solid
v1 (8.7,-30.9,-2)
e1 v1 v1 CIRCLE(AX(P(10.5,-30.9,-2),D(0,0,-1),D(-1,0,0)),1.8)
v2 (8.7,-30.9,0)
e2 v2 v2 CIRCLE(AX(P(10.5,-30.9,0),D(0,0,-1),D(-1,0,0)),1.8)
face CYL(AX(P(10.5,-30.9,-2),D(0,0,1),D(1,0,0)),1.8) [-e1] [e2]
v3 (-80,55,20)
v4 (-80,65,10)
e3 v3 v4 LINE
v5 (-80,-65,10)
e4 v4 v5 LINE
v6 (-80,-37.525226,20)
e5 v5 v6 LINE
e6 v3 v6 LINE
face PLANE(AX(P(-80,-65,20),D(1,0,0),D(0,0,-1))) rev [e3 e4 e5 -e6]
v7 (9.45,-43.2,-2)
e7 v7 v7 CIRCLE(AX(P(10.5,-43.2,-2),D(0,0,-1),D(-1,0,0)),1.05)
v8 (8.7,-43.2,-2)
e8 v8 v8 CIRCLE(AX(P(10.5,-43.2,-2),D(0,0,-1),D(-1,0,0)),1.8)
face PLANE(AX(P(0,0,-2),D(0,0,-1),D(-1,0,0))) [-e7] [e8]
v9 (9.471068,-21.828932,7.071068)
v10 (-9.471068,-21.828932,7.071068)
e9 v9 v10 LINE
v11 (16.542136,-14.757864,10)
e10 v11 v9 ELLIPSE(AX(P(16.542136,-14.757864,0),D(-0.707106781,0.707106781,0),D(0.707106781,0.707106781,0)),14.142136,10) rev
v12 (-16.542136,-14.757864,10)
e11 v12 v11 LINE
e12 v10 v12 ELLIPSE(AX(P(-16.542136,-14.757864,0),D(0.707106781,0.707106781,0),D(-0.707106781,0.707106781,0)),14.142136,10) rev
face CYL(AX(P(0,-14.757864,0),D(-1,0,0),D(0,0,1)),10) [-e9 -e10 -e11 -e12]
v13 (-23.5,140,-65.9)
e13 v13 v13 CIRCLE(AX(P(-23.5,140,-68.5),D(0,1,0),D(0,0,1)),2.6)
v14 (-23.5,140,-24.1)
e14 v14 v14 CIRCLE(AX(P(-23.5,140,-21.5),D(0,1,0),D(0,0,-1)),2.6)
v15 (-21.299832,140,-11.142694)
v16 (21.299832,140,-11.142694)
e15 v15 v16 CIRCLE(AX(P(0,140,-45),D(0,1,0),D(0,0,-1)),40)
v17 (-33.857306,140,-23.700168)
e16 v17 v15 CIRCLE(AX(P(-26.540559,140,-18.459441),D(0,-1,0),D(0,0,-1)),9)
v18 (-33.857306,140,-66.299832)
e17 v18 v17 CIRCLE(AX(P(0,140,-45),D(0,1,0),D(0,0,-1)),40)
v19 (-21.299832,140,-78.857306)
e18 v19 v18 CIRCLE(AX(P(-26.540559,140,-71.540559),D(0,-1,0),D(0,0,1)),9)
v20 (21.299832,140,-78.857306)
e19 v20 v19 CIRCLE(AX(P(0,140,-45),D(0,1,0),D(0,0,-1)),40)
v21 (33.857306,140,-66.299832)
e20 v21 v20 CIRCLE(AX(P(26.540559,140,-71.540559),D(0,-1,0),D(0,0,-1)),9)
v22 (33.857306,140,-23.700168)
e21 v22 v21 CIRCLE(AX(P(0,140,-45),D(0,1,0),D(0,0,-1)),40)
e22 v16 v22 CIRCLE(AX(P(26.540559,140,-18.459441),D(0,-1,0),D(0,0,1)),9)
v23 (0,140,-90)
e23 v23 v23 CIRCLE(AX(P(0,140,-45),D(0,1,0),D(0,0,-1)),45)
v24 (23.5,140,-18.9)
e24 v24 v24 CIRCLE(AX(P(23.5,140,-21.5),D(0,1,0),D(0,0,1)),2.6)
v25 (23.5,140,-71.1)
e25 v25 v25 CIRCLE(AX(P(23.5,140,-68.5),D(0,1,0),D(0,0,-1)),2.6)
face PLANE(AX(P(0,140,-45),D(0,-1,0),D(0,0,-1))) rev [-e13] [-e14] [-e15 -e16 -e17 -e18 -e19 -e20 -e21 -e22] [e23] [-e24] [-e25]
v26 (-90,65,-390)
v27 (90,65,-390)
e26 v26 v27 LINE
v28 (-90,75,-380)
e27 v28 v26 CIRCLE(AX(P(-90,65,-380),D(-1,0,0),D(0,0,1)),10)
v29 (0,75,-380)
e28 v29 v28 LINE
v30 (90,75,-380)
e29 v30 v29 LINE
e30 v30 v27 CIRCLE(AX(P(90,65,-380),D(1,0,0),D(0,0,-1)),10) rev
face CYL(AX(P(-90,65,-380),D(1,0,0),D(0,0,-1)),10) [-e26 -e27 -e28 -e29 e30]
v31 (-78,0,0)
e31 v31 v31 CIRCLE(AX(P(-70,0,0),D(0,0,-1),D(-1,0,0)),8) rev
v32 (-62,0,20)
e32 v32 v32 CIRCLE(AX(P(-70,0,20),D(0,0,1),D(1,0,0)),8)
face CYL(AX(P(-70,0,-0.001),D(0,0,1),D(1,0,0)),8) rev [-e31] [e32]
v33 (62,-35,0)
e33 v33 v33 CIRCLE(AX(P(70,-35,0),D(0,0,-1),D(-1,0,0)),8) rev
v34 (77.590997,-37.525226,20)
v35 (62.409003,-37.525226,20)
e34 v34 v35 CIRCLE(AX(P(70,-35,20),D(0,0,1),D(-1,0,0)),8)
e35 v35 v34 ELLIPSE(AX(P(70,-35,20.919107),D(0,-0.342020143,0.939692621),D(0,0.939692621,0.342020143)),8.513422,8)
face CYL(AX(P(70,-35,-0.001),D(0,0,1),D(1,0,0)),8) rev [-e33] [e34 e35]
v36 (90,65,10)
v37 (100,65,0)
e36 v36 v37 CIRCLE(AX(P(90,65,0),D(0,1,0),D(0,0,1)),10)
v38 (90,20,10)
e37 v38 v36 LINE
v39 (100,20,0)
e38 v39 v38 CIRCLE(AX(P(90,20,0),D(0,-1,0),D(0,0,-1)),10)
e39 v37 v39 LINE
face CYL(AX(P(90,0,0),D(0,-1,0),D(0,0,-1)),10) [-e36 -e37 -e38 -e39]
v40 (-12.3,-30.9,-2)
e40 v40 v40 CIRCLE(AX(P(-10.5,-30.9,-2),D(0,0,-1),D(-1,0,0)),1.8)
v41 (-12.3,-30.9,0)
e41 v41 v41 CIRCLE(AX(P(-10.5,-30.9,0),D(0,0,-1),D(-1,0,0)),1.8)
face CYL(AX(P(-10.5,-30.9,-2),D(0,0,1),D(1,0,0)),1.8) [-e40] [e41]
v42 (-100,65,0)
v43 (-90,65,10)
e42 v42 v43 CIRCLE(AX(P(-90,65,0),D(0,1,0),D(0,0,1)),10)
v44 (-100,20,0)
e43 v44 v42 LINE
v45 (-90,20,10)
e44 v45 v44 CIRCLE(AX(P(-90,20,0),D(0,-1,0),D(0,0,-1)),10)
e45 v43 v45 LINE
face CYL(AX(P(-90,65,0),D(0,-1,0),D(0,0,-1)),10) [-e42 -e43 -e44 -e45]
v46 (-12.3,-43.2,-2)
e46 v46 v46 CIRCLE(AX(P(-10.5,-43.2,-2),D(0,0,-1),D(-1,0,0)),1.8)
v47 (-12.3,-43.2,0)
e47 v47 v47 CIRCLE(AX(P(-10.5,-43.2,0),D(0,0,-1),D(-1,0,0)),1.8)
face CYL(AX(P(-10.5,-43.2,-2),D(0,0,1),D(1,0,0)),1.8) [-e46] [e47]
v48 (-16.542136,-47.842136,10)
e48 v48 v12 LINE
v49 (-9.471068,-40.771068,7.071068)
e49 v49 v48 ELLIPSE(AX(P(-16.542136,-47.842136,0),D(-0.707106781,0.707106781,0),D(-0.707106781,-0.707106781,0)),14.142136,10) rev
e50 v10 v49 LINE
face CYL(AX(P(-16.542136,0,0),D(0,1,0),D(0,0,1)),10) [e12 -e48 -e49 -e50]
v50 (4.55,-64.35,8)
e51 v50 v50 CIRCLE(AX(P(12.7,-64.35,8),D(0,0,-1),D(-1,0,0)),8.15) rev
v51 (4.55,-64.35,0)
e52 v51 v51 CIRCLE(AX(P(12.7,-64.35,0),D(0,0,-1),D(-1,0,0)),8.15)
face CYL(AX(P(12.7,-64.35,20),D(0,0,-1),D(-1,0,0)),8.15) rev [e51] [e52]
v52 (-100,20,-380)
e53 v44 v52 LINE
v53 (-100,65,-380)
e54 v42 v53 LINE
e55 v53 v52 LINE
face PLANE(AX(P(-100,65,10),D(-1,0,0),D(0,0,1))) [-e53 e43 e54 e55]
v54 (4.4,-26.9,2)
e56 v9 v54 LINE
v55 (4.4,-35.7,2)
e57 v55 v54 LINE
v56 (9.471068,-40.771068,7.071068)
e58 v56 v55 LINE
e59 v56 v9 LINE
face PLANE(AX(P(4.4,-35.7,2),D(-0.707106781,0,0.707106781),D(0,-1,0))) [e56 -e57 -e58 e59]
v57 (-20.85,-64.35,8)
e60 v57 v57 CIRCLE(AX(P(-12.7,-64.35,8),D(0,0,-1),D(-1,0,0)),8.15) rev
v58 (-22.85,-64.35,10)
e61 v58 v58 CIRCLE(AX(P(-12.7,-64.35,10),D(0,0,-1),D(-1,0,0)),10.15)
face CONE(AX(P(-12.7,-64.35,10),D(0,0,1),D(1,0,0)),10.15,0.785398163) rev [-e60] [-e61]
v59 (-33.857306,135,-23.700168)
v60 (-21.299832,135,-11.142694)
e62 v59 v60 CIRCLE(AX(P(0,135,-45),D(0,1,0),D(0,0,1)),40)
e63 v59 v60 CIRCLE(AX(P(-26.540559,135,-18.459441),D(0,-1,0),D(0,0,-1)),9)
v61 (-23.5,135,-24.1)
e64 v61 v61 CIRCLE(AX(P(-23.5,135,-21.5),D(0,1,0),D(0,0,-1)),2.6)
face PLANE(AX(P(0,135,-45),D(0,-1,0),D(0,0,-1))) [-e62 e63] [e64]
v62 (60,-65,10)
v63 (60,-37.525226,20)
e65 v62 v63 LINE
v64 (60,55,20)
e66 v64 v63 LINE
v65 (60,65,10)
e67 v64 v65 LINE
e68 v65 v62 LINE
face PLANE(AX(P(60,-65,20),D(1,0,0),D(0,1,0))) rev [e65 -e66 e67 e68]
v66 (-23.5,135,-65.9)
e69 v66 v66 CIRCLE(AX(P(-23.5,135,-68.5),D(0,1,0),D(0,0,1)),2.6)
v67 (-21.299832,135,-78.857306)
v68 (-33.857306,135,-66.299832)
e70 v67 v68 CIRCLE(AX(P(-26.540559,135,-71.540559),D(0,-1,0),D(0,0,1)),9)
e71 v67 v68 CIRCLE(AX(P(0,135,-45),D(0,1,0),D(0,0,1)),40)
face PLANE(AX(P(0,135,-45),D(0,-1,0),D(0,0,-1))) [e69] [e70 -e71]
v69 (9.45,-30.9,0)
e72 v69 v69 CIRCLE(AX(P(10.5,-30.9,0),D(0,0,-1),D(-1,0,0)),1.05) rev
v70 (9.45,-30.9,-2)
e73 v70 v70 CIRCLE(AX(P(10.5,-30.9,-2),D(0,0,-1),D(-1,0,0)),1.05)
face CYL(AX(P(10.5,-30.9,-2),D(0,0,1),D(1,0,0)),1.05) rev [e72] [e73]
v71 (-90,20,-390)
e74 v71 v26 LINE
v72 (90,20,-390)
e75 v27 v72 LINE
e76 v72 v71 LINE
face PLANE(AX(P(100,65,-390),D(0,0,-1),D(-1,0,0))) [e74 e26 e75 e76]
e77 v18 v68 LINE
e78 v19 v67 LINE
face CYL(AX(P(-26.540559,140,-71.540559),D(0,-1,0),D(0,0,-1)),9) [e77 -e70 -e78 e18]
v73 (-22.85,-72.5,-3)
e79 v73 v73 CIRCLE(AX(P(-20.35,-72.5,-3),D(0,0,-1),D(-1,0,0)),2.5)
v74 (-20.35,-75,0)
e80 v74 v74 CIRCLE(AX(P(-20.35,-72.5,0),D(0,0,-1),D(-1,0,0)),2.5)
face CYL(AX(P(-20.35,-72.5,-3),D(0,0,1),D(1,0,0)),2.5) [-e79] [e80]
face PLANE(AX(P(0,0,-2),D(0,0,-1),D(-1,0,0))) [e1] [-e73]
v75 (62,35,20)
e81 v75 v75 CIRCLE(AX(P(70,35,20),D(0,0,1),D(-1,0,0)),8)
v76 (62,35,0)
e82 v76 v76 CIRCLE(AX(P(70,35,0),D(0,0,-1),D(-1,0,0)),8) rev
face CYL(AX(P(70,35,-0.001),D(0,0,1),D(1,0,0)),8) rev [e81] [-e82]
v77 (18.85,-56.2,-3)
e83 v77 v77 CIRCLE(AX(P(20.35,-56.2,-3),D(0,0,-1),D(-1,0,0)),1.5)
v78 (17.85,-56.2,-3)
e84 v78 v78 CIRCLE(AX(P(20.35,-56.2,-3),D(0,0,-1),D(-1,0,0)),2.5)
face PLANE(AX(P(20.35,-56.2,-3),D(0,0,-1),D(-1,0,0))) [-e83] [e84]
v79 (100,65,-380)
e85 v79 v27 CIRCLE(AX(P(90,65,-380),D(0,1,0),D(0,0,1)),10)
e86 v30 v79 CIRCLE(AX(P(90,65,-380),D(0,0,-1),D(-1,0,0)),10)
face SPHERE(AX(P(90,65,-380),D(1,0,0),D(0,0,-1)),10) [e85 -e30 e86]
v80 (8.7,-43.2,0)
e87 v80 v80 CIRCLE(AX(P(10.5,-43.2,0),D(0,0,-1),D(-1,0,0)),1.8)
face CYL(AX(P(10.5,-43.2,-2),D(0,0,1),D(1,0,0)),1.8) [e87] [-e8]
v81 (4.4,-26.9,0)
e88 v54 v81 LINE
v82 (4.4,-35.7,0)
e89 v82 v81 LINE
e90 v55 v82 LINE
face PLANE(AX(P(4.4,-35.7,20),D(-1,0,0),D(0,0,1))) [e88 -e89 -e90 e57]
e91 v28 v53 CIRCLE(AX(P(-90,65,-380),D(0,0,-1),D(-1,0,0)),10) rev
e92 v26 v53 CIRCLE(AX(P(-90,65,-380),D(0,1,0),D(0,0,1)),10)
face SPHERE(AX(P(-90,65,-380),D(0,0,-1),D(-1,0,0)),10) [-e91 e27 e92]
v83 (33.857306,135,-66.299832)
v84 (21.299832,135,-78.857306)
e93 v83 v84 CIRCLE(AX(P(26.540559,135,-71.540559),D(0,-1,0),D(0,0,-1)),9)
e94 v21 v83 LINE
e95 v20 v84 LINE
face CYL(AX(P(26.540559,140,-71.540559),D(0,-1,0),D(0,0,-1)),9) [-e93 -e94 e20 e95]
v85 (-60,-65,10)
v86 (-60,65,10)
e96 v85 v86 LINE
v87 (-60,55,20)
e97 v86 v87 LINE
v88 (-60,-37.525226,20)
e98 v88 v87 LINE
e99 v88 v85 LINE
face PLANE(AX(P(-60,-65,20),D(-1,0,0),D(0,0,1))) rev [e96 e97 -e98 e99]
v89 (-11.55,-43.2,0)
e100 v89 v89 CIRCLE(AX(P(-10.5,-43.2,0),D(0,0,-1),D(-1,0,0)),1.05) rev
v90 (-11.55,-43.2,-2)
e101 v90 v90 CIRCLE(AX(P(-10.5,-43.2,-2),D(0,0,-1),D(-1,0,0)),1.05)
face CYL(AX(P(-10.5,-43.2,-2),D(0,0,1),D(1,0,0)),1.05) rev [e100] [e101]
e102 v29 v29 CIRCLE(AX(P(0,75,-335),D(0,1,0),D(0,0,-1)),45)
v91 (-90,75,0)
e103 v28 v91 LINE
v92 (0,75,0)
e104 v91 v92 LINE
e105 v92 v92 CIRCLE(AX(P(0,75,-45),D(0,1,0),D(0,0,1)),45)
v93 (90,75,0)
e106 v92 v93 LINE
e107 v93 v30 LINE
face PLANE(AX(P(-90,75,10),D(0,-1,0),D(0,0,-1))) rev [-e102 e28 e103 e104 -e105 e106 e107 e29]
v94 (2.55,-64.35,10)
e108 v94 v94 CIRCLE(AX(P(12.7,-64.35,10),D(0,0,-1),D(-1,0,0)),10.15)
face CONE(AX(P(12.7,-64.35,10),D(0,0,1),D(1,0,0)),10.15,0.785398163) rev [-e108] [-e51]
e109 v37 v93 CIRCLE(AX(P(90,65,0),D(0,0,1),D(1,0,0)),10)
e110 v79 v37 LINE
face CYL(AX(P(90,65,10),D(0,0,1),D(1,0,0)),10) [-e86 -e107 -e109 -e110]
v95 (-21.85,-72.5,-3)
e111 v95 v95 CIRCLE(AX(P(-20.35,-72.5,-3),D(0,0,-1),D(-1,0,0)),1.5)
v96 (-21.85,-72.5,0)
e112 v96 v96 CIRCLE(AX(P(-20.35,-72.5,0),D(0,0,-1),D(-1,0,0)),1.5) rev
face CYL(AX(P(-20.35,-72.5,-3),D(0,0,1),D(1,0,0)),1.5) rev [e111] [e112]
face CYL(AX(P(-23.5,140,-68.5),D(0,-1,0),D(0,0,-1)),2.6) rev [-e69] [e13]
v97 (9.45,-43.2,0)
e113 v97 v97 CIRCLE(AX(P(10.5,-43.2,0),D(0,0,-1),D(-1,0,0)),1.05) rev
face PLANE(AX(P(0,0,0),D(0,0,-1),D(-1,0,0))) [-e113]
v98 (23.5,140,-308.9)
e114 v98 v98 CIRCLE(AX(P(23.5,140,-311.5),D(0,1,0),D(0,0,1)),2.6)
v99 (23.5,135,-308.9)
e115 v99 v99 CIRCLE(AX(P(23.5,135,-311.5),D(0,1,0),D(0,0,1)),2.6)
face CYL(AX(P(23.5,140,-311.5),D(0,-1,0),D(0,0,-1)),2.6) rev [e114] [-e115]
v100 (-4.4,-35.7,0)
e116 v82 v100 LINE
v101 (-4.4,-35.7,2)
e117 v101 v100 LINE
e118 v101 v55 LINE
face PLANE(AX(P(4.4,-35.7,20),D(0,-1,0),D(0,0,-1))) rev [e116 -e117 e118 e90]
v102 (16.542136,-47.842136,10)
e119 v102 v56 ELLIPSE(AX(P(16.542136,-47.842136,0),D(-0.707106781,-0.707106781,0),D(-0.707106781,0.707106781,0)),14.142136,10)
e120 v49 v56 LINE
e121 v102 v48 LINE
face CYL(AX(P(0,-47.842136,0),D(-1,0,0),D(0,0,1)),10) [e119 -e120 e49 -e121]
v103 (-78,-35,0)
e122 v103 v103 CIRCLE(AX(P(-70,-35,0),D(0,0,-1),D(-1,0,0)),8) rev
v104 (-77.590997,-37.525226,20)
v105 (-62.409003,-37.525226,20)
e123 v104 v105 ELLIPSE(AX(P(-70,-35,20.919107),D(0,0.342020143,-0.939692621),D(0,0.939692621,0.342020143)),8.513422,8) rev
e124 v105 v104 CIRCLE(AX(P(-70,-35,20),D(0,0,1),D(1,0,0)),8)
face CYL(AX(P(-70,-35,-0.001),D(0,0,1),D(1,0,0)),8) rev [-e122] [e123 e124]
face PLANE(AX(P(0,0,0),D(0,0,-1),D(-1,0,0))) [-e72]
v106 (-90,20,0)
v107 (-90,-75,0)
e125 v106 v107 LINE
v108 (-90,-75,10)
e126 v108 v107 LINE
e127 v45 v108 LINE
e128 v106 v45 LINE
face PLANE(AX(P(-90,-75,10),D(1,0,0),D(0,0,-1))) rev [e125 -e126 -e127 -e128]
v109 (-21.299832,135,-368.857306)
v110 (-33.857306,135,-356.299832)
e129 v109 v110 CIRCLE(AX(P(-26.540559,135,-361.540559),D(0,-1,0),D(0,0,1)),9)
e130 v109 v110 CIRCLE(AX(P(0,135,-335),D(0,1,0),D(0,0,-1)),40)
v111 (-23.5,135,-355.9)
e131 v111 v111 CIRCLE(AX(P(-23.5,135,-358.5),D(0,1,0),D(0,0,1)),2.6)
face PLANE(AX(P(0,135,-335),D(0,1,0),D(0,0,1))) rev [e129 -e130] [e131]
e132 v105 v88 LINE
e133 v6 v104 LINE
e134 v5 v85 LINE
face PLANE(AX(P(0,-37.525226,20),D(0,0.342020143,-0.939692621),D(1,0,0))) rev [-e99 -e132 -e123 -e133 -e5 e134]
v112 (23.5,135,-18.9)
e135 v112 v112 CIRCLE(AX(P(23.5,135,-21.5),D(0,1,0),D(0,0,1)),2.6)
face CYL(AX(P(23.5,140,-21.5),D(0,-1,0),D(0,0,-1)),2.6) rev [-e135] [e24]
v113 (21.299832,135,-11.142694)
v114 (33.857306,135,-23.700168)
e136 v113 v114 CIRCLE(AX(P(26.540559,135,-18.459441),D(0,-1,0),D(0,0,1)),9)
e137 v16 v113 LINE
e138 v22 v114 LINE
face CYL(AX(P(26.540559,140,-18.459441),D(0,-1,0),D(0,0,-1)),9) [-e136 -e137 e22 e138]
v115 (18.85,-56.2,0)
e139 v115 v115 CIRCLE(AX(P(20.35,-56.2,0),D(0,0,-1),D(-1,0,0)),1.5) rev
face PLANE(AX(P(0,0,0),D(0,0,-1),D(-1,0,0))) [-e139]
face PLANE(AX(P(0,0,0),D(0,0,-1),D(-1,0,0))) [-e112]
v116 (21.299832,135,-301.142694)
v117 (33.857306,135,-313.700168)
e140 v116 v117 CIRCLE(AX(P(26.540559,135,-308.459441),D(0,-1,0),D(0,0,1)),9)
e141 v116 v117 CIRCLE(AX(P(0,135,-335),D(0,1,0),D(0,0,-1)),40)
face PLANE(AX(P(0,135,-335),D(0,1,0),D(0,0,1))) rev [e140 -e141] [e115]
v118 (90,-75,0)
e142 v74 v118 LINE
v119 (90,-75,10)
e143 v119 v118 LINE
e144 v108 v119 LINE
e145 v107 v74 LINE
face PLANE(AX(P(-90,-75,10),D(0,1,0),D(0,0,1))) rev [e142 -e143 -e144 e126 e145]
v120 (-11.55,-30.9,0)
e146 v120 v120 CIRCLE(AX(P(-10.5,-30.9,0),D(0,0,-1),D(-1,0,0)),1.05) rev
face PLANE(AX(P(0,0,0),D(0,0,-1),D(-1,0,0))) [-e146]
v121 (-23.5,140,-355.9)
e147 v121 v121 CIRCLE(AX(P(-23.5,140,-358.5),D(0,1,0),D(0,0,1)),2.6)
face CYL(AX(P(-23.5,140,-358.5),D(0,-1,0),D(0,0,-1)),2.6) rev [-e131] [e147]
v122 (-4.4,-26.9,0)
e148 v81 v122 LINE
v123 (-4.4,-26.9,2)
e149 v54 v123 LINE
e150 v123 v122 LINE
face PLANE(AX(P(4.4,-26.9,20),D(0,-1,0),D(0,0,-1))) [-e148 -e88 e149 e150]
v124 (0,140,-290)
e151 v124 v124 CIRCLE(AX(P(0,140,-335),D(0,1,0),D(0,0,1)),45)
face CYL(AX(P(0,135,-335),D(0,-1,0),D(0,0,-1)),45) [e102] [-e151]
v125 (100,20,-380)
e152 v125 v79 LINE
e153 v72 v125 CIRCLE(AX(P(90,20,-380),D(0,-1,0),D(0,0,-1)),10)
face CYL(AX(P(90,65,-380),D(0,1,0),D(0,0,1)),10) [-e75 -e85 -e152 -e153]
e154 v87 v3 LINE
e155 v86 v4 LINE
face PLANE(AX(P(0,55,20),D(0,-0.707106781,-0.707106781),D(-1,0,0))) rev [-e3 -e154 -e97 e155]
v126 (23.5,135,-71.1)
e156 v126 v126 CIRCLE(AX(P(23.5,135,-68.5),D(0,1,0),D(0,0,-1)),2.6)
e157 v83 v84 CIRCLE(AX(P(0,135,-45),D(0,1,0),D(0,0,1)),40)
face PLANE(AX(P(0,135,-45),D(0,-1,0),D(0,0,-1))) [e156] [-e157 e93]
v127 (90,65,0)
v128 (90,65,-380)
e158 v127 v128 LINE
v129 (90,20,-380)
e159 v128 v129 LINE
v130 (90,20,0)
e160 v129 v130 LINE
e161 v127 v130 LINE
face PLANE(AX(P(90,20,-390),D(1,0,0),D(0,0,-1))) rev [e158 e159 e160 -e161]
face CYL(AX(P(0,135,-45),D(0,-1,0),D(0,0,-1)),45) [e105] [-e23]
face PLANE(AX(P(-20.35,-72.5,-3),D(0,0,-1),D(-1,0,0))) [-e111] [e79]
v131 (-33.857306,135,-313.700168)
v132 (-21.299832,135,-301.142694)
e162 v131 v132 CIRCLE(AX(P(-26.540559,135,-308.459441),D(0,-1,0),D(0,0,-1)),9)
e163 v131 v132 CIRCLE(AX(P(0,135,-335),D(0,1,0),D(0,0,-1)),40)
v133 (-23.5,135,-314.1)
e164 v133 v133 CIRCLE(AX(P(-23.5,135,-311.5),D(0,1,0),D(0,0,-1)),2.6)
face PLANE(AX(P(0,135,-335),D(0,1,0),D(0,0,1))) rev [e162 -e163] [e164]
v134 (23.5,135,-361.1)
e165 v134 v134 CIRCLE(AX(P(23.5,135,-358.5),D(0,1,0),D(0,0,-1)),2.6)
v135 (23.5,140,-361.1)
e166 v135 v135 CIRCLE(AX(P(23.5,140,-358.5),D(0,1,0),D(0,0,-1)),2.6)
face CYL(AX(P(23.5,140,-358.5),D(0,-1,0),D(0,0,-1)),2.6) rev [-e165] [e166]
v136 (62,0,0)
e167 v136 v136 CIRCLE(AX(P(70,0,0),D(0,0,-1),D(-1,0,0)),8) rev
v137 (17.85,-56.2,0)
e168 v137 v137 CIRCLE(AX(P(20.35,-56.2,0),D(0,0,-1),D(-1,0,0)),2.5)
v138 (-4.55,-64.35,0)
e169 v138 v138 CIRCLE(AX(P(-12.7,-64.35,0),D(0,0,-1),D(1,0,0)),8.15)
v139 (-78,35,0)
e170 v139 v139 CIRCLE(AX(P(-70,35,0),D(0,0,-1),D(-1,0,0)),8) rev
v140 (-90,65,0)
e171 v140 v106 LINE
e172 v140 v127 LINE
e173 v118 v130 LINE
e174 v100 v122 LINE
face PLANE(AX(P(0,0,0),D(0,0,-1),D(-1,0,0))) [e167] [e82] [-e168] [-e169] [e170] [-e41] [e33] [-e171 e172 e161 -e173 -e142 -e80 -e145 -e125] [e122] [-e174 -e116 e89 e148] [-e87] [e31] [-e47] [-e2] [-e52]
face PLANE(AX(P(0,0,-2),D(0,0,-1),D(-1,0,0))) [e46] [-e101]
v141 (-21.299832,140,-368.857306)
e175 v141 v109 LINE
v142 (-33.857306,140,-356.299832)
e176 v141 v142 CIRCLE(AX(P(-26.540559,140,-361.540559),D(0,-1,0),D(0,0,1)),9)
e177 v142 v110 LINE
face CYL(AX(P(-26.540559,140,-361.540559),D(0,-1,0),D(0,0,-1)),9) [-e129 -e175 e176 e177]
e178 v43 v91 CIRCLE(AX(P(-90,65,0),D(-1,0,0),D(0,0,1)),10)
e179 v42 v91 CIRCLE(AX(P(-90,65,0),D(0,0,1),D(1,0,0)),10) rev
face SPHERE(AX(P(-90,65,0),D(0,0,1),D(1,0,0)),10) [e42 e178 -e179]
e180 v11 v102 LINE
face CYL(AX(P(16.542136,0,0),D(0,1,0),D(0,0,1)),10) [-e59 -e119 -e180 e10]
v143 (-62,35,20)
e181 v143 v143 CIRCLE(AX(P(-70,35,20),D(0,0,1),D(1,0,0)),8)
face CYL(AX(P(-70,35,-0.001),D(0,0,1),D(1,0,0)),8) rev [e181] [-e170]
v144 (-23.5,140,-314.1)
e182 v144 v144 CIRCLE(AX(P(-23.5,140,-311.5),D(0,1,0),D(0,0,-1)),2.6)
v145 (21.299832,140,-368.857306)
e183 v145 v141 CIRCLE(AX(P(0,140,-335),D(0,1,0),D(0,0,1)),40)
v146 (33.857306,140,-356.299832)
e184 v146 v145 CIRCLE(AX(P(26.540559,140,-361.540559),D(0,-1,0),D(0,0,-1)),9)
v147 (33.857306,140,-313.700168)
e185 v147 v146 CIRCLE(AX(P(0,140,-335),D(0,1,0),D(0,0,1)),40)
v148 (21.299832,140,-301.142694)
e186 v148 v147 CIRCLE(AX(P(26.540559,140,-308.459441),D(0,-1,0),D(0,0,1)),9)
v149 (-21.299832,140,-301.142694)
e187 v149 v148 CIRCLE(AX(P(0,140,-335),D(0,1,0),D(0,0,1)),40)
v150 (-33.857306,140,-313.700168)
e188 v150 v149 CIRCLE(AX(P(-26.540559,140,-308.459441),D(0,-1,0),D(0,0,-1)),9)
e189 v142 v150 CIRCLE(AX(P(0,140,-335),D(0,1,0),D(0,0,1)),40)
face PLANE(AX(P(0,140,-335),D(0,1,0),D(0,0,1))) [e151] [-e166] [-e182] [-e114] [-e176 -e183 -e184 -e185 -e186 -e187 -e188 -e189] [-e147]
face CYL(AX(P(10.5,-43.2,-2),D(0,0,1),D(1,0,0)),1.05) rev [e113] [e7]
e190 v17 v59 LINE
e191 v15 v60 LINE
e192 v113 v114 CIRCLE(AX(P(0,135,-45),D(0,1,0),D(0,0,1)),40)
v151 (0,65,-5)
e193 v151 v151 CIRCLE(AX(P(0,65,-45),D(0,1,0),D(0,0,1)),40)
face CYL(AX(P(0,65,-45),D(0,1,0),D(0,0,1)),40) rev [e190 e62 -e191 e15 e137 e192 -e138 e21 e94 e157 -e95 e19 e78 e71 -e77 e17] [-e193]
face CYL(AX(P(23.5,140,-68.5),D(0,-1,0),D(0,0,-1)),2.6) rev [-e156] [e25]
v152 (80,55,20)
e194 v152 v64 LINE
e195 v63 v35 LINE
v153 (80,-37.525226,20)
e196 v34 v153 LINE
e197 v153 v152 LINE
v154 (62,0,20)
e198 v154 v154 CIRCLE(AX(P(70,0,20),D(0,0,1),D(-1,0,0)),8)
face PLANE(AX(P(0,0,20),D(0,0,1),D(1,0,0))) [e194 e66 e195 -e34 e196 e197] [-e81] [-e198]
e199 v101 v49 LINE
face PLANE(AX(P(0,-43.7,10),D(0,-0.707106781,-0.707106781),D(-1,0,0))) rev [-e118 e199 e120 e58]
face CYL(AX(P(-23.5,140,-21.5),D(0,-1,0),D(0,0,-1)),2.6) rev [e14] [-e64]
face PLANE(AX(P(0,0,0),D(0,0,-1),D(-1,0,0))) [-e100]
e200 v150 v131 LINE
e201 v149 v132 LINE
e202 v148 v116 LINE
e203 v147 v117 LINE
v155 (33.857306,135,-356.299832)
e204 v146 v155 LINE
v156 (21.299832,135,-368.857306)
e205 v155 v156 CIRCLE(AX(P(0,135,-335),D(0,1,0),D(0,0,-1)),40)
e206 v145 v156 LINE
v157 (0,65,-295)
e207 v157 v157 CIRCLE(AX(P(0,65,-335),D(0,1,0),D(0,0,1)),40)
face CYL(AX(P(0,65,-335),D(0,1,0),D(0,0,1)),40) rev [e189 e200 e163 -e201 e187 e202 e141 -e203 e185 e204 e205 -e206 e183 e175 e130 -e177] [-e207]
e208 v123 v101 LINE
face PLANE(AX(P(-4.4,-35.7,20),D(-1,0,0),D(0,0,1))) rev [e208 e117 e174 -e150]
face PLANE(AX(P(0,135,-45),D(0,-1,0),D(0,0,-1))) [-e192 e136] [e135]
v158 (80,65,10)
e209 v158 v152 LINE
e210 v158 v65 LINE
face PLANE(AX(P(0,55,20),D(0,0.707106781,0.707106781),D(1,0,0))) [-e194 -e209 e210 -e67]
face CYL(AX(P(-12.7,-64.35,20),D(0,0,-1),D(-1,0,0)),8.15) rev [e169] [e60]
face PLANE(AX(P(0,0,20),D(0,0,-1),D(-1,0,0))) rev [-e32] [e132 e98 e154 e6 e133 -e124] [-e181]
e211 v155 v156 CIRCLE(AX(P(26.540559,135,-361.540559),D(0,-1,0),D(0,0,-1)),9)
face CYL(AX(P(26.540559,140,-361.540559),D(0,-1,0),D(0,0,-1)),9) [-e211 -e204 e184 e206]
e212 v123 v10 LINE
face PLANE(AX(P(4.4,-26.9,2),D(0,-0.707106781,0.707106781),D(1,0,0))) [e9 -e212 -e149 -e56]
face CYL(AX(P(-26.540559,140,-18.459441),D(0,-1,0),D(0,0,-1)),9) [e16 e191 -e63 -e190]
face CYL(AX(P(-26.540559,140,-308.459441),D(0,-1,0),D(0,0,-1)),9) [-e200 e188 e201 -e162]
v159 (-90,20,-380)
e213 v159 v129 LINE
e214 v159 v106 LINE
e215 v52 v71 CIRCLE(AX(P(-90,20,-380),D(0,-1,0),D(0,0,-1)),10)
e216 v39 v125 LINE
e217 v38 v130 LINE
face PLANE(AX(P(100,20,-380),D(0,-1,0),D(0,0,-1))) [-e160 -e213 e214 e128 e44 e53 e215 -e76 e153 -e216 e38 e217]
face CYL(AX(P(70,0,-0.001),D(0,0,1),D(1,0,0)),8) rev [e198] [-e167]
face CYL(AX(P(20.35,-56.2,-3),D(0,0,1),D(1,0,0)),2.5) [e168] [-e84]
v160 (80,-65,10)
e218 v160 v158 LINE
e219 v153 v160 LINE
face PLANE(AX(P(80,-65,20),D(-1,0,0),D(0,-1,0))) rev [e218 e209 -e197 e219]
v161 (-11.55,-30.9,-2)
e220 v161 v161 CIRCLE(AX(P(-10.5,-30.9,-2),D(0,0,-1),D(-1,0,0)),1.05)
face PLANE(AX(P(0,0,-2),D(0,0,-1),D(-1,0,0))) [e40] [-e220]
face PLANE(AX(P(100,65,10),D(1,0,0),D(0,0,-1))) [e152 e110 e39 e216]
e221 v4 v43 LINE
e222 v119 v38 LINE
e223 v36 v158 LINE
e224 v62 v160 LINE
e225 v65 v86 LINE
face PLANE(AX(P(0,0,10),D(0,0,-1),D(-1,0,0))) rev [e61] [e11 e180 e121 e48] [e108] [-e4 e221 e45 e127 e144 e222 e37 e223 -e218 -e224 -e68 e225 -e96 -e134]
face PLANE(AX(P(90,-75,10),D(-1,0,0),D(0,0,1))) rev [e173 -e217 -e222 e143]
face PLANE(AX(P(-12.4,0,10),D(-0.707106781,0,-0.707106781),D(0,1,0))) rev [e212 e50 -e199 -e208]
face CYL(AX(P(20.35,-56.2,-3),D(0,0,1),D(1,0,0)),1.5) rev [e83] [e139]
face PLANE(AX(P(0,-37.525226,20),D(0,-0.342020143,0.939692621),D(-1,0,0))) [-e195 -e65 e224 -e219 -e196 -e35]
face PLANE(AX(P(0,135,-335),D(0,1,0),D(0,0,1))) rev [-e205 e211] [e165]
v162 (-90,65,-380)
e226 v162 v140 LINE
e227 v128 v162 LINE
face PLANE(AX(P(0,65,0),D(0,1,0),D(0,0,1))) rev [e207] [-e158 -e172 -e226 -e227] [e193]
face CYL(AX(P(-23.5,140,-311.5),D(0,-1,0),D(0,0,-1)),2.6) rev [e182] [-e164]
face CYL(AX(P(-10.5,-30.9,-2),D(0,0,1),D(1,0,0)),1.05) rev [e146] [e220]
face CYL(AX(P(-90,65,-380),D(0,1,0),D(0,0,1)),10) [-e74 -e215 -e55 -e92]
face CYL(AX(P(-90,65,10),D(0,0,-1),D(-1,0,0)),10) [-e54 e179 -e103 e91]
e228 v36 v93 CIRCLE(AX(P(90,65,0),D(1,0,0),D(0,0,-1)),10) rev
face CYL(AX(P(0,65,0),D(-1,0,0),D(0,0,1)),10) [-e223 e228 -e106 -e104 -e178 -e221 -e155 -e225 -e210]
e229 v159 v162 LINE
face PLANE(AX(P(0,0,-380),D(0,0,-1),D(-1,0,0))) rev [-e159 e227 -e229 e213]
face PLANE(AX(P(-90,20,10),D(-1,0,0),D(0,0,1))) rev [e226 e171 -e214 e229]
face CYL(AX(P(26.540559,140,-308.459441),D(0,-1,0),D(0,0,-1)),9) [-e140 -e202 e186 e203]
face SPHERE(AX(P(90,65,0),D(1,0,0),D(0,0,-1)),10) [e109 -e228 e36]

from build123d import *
from build123d.topology import SkipClean

# Parameters (mm, degrees)
SKETCH1_W            = 180
SKETCH1_H            = 150
BOSS_EXTRUDE1_DEPTH  = 10
SKETCH2_W            = 20
SKETCH2_H            = 130
BOSS_EXTRUDE2_DEPTH  = 10
CUT_EXTRUDE1_REACH   = 120.849
SKETCH3_R            = 8
CHAMFER1_SIZE        = 10
CHAMFER2_SIZE        = 27.474774195
CHAMFER2_SIZE_2      = 10
SKETCH5_W            = 200
SKETCH5_H            = 400
BOSS_EXTRUDE4_DEPTH  = 10
SKETCH6_W            = 200
SKETCH6_H            = 55
BOSS_EXTRUDE5_DEPTH  = 10
SKETCH7_W            = 10
SKETCH7_H            = 400
BOSS_EXTRUDE6_DEPTH  = 45
FILLET1_R            = 10
SKETCH9_R            = 40
CUT_EXTRUDE2_DEPTH   = 10
SKETCH10_W           = 380
SKETCH10_H           = 10
BOSS_EXTRUDE7_DEPTH  = 180
SKETCH11_W           = 180
SKETCH11_H           = 200
SKETCH11_W_2         = 30
SKETCH11_H_2         = 20
CUT_EXTRUDE5_DEPTH   = 10
BOSS_EXTRUDE8_START  = 60
SKETCH13_R           = 45
SKETCH13_R_2         = 40
BOSS_EXTRUDE8_DEPTH  = 60
BOSS_EXTRUDE9_START  = 5
SKETCH14_R           = 45
SKETCH14_R_2         = 2.6
BOSS_EXTRUDE9_DEPTH  = 5
SKETCH17_R           = 2.5
SKETCH17_R_2         = 1.5
BOSS_EXTRUDE10_DEPTH = 3
SKETCH18_R           = 8.15
CUT_EXTRUDE6_DEPTH   = 427.262829719
CHAMFER3_SIZE        = 2
SKETCH20_R           = 1.8
SKETCH20_R_2         = 1.05
BOSS_EXTRUDE11_DEPTH = 2
SKETCH21_W           = 8.8
SKETCH21_H           = 8.8
CUT_EXTRUDE7_DEPTH   = 427.262829719
CHAMFER4_SIZE        = 8
FILLET2_R            = 10
SKETCH22_W           = 180
SKETCH22_H           = 380
CUT_EXTRUDE8_DEPTH   = 10


# Some blends are built 0.0001 mm under size
with BuildPart() as part:
    # Sketch1 → Boss-Extrude1 (new body)
    with BuildSketch(Plane.XY):
        Rectangle(SKETCH1_W, SKETCH1_H)
    extrude(amount=BOSS_EXTRUDE1_DEPTH)

    # Sketch2 → Boss-Extrude2 (add)
    with BuildSketch(Plane.XY.offset(10)):
        with Locations((70, 0)):
            Rectangle(SKETCH2_W, SKETCH2_H)
        with Locations((-70, 0)):
            Rectangle(SKETCH2_W, SKETCH2_H)
    extrude(amount=BOSS_EXTRUDE2_DEPTH)

    # Sketch3 → Cut-Extrude1 (cut, up to next)
    with BuildSketch(Plane.XY.offset(20), mode=Mode.PRIVATE) as cut_extrude1_sk1:
        with Locations((-70, 0)):
            Circle(SKETCH3_R)
    cut_extrude1_tool1 = extrude(cut_extrude1_sk1.sketch, amount=-CUT_EXTRUDE1_REACH, mode=Mode.PRIVATE) & part.part
    # Sketch3 → Cut-Extrude1 (cut, up to next)
    with BuildSketch(Plane.XY.offset(20), mode=Mode.PRIVATE) as cut_extrude1_sk2:
        with Locations((-70, -35)):
            Circle(SKETCH3_R)
    cut_extrude1_tool2 = extrude(cut_extrude1_sk2.sketch, amount=-CUT_EXTRUDE1_REACH, mode=Mode.PRIVATE) & part.part
    # Sketch3 → Cut-Extrude1 (cut, up to next)
    with BuildSketch(Plane.XY.offset(20), mode=Mode.PRIVATE) as cut_extrude1_sk3:
        with Locations((-70, 35)):
            Circle(SKETCH3_R)
    cut_extrude1_tool3 = extrude(cut_extrude1_sk3.sketch, amount=-CUT_EXTRUDE1_REACH, mode=Mode.PRIVATE) & part.part
    # Sketch3 → Cut-Extrude1 (cut, up to next)
    with BuildSketch(Plane.XY.offset(20), mode=Mode.PRIVATE) as cut_extrude1_sk4:
        with Locations(Location((70, -35, 0), (0, 0, 180))):
            Circle(SKETCH3_R)
    cut_extrude1_tool4 = extrude(cut_extrude1_sk4.sketch, amount=-CUT_EXTRUDE1_REACH, mode=Mode.PRIVATE) & part.part
    # Sketch3 → Cut-Extrude1 (cut, up to next)
    with BuildSketch(Plane.XY.offset(20), mode=Mode.PRIVATE) as cut_extrude1_sk5:
        with Locations(Location((70, 0, 0), (0, 0, 180))):
            Circle(SKETCH3_R)
    cut_extrude1_tool5 = extrude(cut_extrude1_sk5.sketch, amount=-CUT_EXTRUDE1_REACH, mode=Mode.PRIVATE) & part.part
    # Sketch3 → Cut-Extrude1 (cut, up to next)
    with BuildSketch(Plane.XY.offset(20), mode=Mode.PRIVATE) as cut_extrude1_sk6:
        with Locations(Location((70, 35, 0), (0, 0, 180))):
            Circle(SKETCH3_R)
    cut_extrude1_tool6 = extrude(cut_extrude1_sk6.sketch, amount=-CUT_EXTRUDE1_REACH, mode=Mode.PRIVATE) & part.part
    add(cut_extrude1_tool1.solids().sort_by_distance((-70, 0, 20))[0], mode=Mode.SUBTRACT)
    add(cut_extrude1_tool2.solids().sort_by_distance((-70, -35, 20))[0], mode=Mode.SUBTRACT)
    add(cut_extrude1_tool3.solids().sort_by_distance((-70, 35, 20))[0], mode=Mode.SUBTRACT)
    add(cut_extrude1_tool4.solids().sort_by_distance((70, -35, 20))[0], mode=Mode.SUBTRACT)
    add(cut_extrude1_tool5.solids().sort_by_distance((70, 0, 20))[0], mode=Mode.SUBTRACT)
    add(cut_extrude1_tool6.solids().sort_by_distance((70, 35, 20))[0], mode=Mode.SUBTRACT)

    # Chamfer1
    chamfer1_edges = [part.edges().sort_by_distance(p)[0] for p in [
        (70, 65, 20),
        (-70, 65, 20),
    ]]
    chamfer(chamfer1_edges, length=CHAMFER1_SIZE - 0.0001)  # a hair under: the kernel refuses the full size

    # Chamfer2
    # the kernel refuses this chamfer: 27.474774195, 10 mm, written as the material it takes off along each edge
    with BuildSketch(Plane(origin=(-11.274914494, -65, 20), x_dir=(0, 0.9999130865277315, 0.013184058198645822), z_dir=(1, 0, 0))) as chamfer2_piece_1_section:
        Polygon((CHAMFER2_SIZE * 0.999913086511, -CHAMFER2_SIZE * 0.0131840581984), (-CHAMFER2_SIZE_2 * 0.0131840581986, -CHAMFER2_SIZE_2 * 0.999913086528), (0, 0), align=None)
    chamfer2_piece_1 = extrude(amount=162.549828987, mode=Mode.PRIVATE)
    chamfer2_piece_1 = split(chamfer2_piece_1, bisect_by=Plane(origin=(70, -55.574652425, 10), z_dir=(0, 0, 1)), keep=Keep.TOP, mode=Mode.PRIVATE)
    add(chamfer2_piece_1, mode=Mode.SUBTRACT)
    with BuildSketch(Plane(origin=(-151.274914494, -65, 20), x_dir=(0, -0.09904090225205088, -0.9950833631817486), z_dir=(1, 0, 0))) as chamfer2_piece_2_section:
        Polygon((CHAMFER2_SIZE_2 * 0.995083363182, CHAMFER2_SIZE_2 * 0.0990409022521), (-CHAMFER2_SIZE * 0.0990409022504, CHAMFER2_SIZE * 0.995083363165), (0, 0), align=None)
    chamfer2_piece_2 = extrude(amount=162.549828987, mode=Mode.PRIVATE)
    chamfer2_piece_2 = split(chamfer2_piece_2, bisect_by=Plane(origin=(-70, -55.574652425, 10), z_dir=(0, 0, 1)), keep=Keep.TOP, mode=Mode.PRIVATE)
    add(chamfer2_piece_2, mode=Mode.SUBTRACT)

    # Sketch5 → Boss-Extrude4 (add)
    with BuildSketch(Plane(origin=(0, 75, 0), x_dir=(1, 0, 0), z_dir=(0, 1, 0))):
        with Locations((0, 190)):
            Rectangle(SKETCH5_W, SKETCH5_H)
    extrude(amount=-BOSS_EXTRUDE4_DEPTH)

    # Sketch6 → Boss-Extrude5 (add)
    with BuildSketch(Plane(origin=(0, 0, -390), x_dir=(-1, 0, 0), z_dir=(0, 0, -1))):
        with Locations((0, 47.5)):
            Rectangle(SKETCH6_W, SKETCH6_H)
    extrude(amount=-BOSS_EXTRUDE5_DEPTH)

    # Sketch7 → Boss-Extrude6 (add)
    with BuildSketch(Plane.XZ.offset(-65)):
        with Locations((-95, -190)):
            Rectangle(SKETCH7_W, SKETCH7_H)
        with Locations((95, -190)):
            Rectangle(SKETCH7_W, SKETCH7_H)
    extrude(amount=BOSS_EXTRUDE6_DEPTH)

    # Fillet1
    fillet1_edges = [part.edges().sort_by_distance(p)[0] for p in [
        (-100, 75, -190),
        (100, 75, -190),
        (0, 75, -390),
        (0, 75, 10),
        (100, 47.5, 10),
        (100, 47.5, -390),
        (-100, 47.5, -390),
        (-100, 47.5, 10),
    ]]
    fillet(fillet1_edges, radius=FILLET1_R - 0.0001)  # a hair under: the kernel refuses the full size

    # Sketch9 → Cut-Extrude2 (cut)
    with BuildSketch(Plane(origin=(0, 75, 0), x_dir=(1, 0, 0), z_dir=(0, 1, 0))):
        with Locations(Location((0, 45, 0), (0, 0, 270))):
            Circle(SKETCH9_R)
        with Locations(Location((0, 335, 0), (0, 0, 270))):
            Circle(SKETCH9_R)
    extrude(amount=-CUT_EXTRUDE2_DEPTH, mode=Mode.SUBTRACT)

    # Sketch10 → Boss-Extrude7 (add)
    with BuildSketch(Plane(origin=(-90, 0, 0), x_dir=(0, 0, -1), z_dir=(1, 0, 0))):
        with Locations((190, 25)):
            Rectangle(SKETCH10_W, SKETCH10_H)
    extrude(amount=BOSS_EXTRUDE7_DEPTH)

    # Sketch11 → Cut-Extrude5 (cut)
    with BuildSketch(Plane.XZ.offset(-20)):
        with Locations((0, -190)):
            Rectangle(SKETCH11_W, SKETCH11_H)
        with Locations((-75, -10)):
            Rectangle(SKETCH11_W_2, SKETCH11_H_2)
        with Locations((75, -10)):
            Rectangle(SKETCH11_W_2, SKETCH11_H_2)
    extrude(amount=-CUT_EXTRUDE5_DEPTH, mode=Mode.SUBTRACT)

    # Sketch13 → Boss-Extrude8 (add)
    # profile 1 of 2: a face of its own
    with BuildSketch(Plane(origin=(0, 75, 0), x_dir=(1, 0, 0), z_dir=(0, 1, 0)).offset(BOSS_EXTRUDE8_START)):
        with Locations(Location((0, 45, 0), (0, 0, 270))):
            Circle(SKETCH13_R)
        with Locations(Location((0, 45, 0), (0, 0, 270))):
            Circle(SKETCH13_R_2, mode=Mode.SUBTRACT)
    # profile 2 of 2: a face of its own
    with BuildSketch(Plane(origin=(0, 75, 0), x_dir=(1, 0, 0), z_dir=(0, 1, 0)).offset(BOSS_EXTRUDE8_START)):
        with Locations(Location((0, 335, 0), (0, 0, 90))):
            Circle(SKETCH13_R)
        with Locations(Location((0, 335, 0), (0, 0, 270))):
            Circle(SKETCH13_R_2, mode=Mode.SUBTRACT)
    extrude(amount=-BOSS_EXTRUDE8_DEPTH)

    # Sketch14 → Boss-Extrude9 (add)
    # profile 1 of 2: a face of its own
    with SkipClean():  # the faces are left unmerged after this step: merging them gives an invalid solid
        with BuildSketch(Plane(origin=(0, 135, 0), x_dir=(1, 0, 0), z_dir=(0, 1, 0)).offset(BOSS_EXTRUDE9_START)):
            with Locations(Location((0, 335, 0), (0, 0, 90))):
                Circle(SKETCH14_R)
            with Locations(Location((-23.5, 358.5, 0), (0, 0, 270))):
                Circle(SKETCH14_R_2, mode=Mode.SUBTRACT)
            with Locations(Location((23.5, 358.5, 0), (0, 0, 90))):
                Circle(SKETCH14_R_2, mode=Mode.SUBTRACT)
            with Locations(Location((23.5, 311.5, 0), (0, 0, 270))):
                Circle(SKETCH14_R_2, mode=Mode.SUBTRACT)
            with Locations(Location((-23.5, 311.5, 0), (0, 0, 90))):
                Circle(SKETCH14_R_2, mode=Mode.SUBTRACT)
            with BuildLine():
                ThreePointArc((-33.857305724, 356.299832138), (-20.176598128, 355.176598128), (-21.299832138, 368.857305724))
                ThreePointArc((-21.299832138, 368.857305724), (0, 375), (21.299832138, 368.857305724))
                ThreePointArc((21.299832138, 368.857305724), (20.176598128, 355.176598128), (33.857305724, 356.299832138))
                ThreePointArc((33.857305724, 356.299832138), (40, 335), (33.857305724, 313.700167862))
                ThreePointArc((33.857305724, 313.700167862), (20.176598128, 314.823401872), (21.299832138, 301.142694276))
                ThreePointArc((21.299832138, 301.142694276), (0, 295), (-21.299832138, 301.142694276))
                ThreePointArc((-21.299832138, 301.142694276), (-20.176598128, 314.823401872), (-33.857305724, 313.700167862))
                ThreePointArc((-33.857305724, 313.700167862), (-40, 335), (-33.857305724, 356.299832138))
            make_face(mode=Mode.SUBTRACT)
        # profile 2 of 2: a face of its own
        with BuildSketch(Plane(origin=(0, 135, 0), x_dir=(1, 0, 0), z_dir=(0, 1, 0)).offset(BOSS_EXTRUDE9_START)):
            with Locations(Location((0, 45, 0), (0, 0, 90))):
                Circle(SKETCH14_R)
            with Locations(Location((-23.5, 68.5, 0), (0, 0, 270))):
                Circle(SKETCH14_R_2, mode=Mode.SUBTRACT)
            with Locations(Location((23.5, 68.5, 0), (0, 0, 90))):
                Circle(SKETCH14_R_2, mode=Mode.SUBTRACT)
            with Locations(Location((23.5, 21.5, 0), (0, 0, 270))):
                Circle(SKETCH14_R_2, mode=Mode.SUBTRACT)
            with Locations(Location((-23.5, 21.5, 0), (0, 0, 90))):
                Circle(SKETCH14_R_2, mode=Mode.SUBTRACT)
            with BuildLine():
                ThreePointArc((-33.857305724, 23.700167862), (-40, 45), (-33.857305724, 66.299832138))
                ThreePointArc((-33.857305724, 66.299832138), (-20.176598128, 65.176598128), (-21.299832138, 78.857305724))
                ThreePointArc((-21.299832138, 78.857305724), (0, 85), (21.299832138, 78.857305724))
                ThreePointArc((21.299832138, 78.857305724), (20.176598128, 65.176598128), (33.857305724, 66.299832138))
                ThreePointArc((33.857305724, 66.299832138), (40, 45), (33.857305724, 23.700167862))
                ThreePointArc((33.857305724, 23.700167862), (20.176598128, 24.823401872), (21.299832138, 11.142694276))
                ThreePointArc((21.299832138, 11.142694276), (0, 5), (-21.299832138, 11.142694276))
                ThreePointArc((-21.299832138, 11.142694276), (-20.176598128, 24.823401872), (-33.857305724, 23.700167862))
            make_face(mode=Mode.SUBTRACT)
        extrude(amount=-BOSS_EXTRUDE9_DEPTH)

    # Sketch17 → Boss-Extrude10 (add)
    # profile 1 of 2: a face of its own
    with SkipClean():  # the faces are left unmerged after this step: merging them gives an invalid solid
        with BuildSketch(Plane(origin=(0, 0, 0), x_dir=(-1, 0, 0), z_dir=(0, 0, -1))):
            with Locations((-20.35, -56.2)):
                Circle(SKETCH17_R)
            with Locations((-20.35, -56.2)):
                Circle(SKETCH17_R_2, mode=Mode.SUBTRACT)
        # profile 2 of 2: a face of its own
        with BuildSketch(Plane(origin=(0, 0, 0), x_dir=(-1, 0, 0), z_dir=(0, 0, -1))):
            with Locations(Location((20.35, -72.5, 0), (0, 0, 270))):
                Circle(SKETCH17_R)
            with Locations((20.35, -72.5)):
                Circle(SKETCH17_R_2, mode=Mode.SUBTRACT)
        extrude(amount=BOSS_EXTRUDE10_DEPTH)

    # Sketch18 → Cut-Extrude6 (cut, through all)
    with SkipClean():  # the faces are left unmerged after this step: merging them gives an invalid solid
        with BuildSketch(Plane(origin=(0, 0, 0), x_dir=(-1, 0, 0), z_dir=(0, 0, -1))):
            with Locations((-12.7, -64.35)):
                Circle(SKETCH18_R)
            with Locations((12.7, -64.35)):
                Circle(SKETCH18_R)
        extrude(amount=-CUT_EXTRUDE6_DEPTH, mode=Mode.SUBTRACT)

    # Chamfer3
    chamfer3_edges = [part.edges().sort_by_distance(p)[0] for p in [
        (20.85, -64.35, 10),
        (-4.55, -64.35, 10),
    ]]
    chamfer(chamfer3_edges, length=CHAMFER3_SIZE)

    # Sketch20 → Boss-Extrude11 (add)
    # profile 1 of 4: a face of its own
    with SkipClean():  # the faces are left unmerged after this step: merging them gives an invalid solid
        with BuildSketch(Plane(origin=(0, 0, 0), x_dir=(-1, 0, 0), z_dir=(0, 0, -1))):
            with Locations((-10.5, -30.9)):
                Circle(SKETCH20_R)
            with Locations((-10.5, -30.9)):
                Circle(SKETCH20_R_2, mode=Mode.SUBTRACT)
        # profile 2 of 4: a face of its own
        with BuildSketch(Plane(origin=(0, 0, 0), x_dir=(-1, 0, 0), z_dir=(0, 0, -1))):
            with Locations((10.5, -30.9)):
                Circle(SKETCH20_R)
            with Locations((10.5, -30.9)):
                Circle(SKETCH20_R_2, mode=Mode.SUBTRACT)
        # profile 3 of 4: a face of its own
        with BuildSketch(Plane(origin=(0, 0, 0), x_dir=(-1, 0, 0), z_dir=(0, 0, -1))):
            with Locations((10.5, -43.2)):
                Circle(SKETCH20_R)
            with Locations((10.5, -43.2)):
                Circle(SKETCH20_R_2, mode=Mode.SUBTRACT)
        # profile 4 of 4: a face of its own
        with BuildSketch(Plane(origin=(0, 0, 0), x_dir=(-1, 0, 0), z_dir=(0, 0, -1))):
            with Locations((-10.5, -43.2)):
                Circle(SKETCH20_R)
            with Locations((-10.5, -43.2)):
                Circle(SKETCH20_R_2, mode=Mode.SUBTRACT)
        extrude(amount=BOSS_EXTRUDE11_DEPTH)

    # Sketch21 → Cut-Extrude7 (cut, through all)
    with SkipClean():  # the faces are left unmerged after this step: merging them gives an invalid solid
        with BuildSketch(Plane(origin=(0, 0, 0), x_dir=(-1, 0, 0), z_dir=(0, 0, -1))):
            with Locations((0, -31.3)):
                Rectangle(SKETCH21_W, SKETCH21_H)
        extrude(amount=-CUT_EXTRUDE7_DEPTH, mode=Mode.SUBTRACT)

    # Chamfer4
    chamfer4_edges = [part.edges().sort_by_distance(p)[0] for p in [
        (4.4, -31.3, 10),
        (0, -35.7, 10),
        (-4.4, -31.3, 10),
        (0, -26.9, 10),
    ]]
    chamfer(chamfer4_edges, length=CHAMFER4_SIZE)

    # Fillet2
    fillet2_edges = [part.edges().sort_by_distance(p)[0] for p in [
        (0, -18.9, 10),
        (12.4, -31.3, 10),
        (-12.4, -31.3, 10),
        (0, -43.7, 10),
    ]]
    fillet(fillet2_edges, radius=FILLET2_R)

    # Sketch22 → Cut-Extrude8 (cut)
    with SkipClean():  # the faces are left unmerged after this step: merging them gives an invalid solid
        with BuildSketch(Plane.XZ.offset(-20)):
            with Locations((0, -190)):
                Rectangle(SKETCH22_W, SKETCH22_H)
        extrude(amount=-CUT_EXTRUDE8_DEPTH, mode=Mode.SUBTRACT)


solid = part.part
